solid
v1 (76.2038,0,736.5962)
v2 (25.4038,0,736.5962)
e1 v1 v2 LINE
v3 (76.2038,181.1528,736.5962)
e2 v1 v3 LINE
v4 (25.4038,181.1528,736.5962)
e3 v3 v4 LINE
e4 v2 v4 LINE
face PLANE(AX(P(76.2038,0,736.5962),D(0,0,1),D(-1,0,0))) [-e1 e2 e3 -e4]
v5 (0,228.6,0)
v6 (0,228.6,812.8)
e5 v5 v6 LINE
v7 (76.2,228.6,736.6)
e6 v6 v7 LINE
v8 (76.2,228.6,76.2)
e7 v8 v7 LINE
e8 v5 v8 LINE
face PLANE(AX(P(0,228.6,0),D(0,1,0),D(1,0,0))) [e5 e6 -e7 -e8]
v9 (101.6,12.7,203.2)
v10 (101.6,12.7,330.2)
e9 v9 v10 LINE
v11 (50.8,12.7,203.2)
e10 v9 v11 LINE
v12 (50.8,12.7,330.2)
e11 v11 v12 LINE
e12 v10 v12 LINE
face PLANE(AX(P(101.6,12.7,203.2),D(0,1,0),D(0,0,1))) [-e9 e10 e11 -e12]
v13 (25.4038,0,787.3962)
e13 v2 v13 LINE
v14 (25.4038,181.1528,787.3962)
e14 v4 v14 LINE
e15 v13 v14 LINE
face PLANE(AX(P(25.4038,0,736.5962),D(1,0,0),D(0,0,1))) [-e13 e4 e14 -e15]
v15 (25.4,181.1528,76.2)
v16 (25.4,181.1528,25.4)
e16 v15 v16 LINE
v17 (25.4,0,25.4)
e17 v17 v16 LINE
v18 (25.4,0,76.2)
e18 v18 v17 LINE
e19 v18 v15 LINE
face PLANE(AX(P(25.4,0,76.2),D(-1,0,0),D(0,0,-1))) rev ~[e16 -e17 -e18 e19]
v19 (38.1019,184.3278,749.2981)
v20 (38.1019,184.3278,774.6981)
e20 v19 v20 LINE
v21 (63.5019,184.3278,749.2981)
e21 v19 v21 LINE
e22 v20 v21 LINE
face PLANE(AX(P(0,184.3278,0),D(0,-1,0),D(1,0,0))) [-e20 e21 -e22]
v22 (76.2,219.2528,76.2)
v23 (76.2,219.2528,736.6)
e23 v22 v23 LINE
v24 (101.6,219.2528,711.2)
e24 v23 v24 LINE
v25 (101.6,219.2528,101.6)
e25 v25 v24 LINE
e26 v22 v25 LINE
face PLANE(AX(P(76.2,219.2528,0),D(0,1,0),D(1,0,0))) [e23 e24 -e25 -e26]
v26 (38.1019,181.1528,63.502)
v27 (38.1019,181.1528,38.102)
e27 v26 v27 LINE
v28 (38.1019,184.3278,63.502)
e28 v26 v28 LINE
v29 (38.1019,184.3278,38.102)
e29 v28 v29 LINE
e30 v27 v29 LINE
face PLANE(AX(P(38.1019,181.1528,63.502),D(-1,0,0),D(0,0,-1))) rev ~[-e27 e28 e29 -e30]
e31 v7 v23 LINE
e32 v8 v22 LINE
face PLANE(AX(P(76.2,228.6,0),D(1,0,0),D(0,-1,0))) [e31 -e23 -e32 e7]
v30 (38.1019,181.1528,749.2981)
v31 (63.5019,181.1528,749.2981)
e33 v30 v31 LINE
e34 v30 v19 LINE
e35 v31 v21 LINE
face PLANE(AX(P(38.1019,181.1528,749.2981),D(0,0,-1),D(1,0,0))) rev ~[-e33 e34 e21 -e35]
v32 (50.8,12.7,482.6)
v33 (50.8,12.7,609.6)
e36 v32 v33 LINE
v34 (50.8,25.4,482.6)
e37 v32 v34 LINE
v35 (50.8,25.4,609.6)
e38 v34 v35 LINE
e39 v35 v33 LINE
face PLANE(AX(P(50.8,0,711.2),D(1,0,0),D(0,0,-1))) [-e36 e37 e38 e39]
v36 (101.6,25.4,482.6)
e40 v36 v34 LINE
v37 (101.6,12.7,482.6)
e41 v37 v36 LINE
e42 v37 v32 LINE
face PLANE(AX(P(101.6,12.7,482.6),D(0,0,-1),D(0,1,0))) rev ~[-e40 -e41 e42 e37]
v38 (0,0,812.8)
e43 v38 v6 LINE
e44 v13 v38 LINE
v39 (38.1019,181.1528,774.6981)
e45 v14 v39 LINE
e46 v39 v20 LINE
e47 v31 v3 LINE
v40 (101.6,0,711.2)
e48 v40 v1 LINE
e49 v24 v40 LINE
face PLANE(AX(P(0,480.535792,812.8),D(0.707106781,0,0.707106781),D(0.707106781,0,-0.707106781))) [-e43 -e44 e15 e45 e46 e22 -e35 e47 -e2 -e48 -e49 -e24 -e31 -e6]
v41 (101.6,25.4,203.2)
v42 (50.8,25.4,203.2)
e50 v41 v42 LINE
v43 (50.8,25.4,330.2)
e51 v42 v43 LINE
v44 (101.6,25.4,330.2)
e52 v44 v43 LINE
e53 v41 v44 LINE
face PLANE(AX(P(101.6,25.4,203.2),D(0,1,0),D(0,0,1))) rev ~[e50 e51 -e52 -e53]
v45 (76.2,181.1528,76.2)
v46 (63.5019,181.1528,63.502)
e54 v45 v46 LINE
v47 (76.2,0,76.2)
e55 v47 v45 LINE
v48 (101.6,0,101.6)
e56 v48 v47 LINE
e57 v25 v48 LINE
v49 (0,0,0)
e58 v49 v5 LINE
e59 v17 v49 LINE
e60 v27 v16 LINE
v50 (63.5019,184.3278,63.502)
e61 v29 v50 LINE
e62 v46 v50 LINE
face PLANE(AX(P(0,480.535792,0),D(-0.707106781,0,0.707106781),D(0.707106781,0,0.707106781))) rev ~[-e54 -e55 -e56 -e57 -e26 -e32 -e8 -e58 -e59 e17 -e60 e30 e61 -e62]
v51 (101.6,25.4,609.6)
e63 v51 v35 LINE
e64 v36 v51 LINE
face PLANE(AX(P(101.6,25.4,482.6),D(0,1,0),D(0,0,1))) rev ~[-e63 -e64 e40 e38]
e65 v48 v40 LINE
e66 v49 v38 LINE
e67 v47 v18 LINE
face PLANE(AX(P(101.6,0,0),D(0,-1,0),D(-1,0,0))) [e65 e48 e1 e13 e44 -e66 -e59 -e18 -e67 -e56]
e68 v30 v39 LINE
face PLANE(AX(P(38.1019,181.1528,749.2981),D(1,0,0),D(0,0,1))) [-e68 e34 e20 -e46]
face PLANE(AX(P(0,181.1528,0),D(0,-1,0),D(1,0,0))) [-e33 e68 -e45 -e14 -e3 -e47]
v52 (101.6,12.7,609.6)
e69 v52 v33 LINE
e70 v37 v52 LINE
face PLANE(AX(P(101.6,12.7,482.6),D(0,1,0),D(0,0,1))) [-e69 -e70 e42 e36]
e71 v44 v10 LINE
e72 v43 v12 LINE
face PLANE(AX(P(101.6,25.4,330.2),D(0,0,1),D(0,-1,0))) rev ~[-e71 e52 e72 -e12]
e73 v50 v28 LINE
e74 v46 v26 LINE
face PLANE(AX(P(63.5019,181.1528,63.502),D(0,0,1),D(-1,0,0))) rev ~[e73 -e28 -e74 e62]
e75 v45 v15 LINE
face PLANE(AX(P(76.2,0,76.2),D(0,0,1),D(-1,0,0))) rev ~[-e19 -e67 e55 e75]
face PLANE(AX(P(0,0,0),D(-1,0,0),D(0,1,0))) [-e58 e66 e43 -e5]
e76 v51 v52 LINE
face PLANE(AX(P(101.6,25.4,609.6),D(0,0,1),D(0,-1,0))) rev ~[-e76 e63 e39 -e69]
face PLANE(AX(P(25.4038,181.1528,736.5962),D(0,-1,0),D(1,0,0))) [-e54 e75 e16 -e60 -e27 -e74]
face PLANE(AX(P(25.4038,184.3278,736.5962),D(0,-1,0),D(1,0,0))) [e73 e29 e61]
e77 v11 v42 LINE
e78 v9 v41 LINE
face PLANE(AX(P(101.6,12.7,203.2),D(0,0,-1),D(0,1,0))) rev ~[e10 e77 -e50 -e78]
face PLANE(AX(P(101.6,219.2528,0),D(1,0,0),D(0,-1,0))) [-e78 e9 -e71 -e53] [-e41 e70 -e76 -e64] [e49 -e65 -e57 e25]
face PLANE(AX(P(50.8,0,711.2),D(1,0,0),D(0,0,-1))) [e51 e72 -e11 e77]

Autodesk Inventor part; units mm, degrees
ref_plane "YZ Plane" through (0, 0, 0) normal (1, 0, 0) x (0, 1, 0)
ref_plane "XZ Plane" through (0, 0, 0) normal (0, 1, 0) x (-1, 0, 0)
ref_plane "XY Plane" through (0, 0, 0) normal (0, 0, 1) x (1, 0, 0)
sketch "Sketch1" plane through (0, 0, 0) normal (0, 0, 1) x (1, 0, 0)
  line L0 (0, 0) -> (0, 228.6)
  line L1 (0, 228.6) -> (76.2, 228.6)
  line L2 (76.2, 228.6) -> (76.2, 219.2528)
  line L3 (76.2, 219.2528) -> (101.6, 219.2528)
  line L4 (101.6, 219.2528) -> (101.6, 0)
  line L5 (101.6, 0) -> (0, 0)
  dimension "d0" = 228.6
  dimension "d1" = 76.2
  dimension "d2" = 9.3472
  dimension "d3" = 25.4
extrude "Extrusion1" add sketch "Sketch1" along normal blind 812.8
sketch "Sketch6" plane through (0, 0, 0) normal (0, -1, 0) x (1, 0, 0)
  line L0 (101.6, 0) -> (101.6, 812.8) projected
  line L1 (0, 812.8) -> (101.6, 711.2) projected
  line L2 (76.2038, 736.5962) -> (25.4038, 736.5962)
  line L3 (25.4038, 736.5962) -> (25.4038, 787.3962)
  line L4 (25.4038, 787.3962) -> (76.2, 736.6)
  point P0 (0, 0)
  point P1 (101.6, 101.6)
  dimension "d31" = 35.9156
  dimension "d32" = 50.8
  dimension "d33" = 50.8
extrude "Extrusion4" cut sketch "Sketch6" against normal blind 181.1528
sketch "Sketch7" plane through (25.4038, 0, 736.5962) normal (0, -1, 0) x (1, 0, 0)
  line L0 (76.1962, -634.9962) -> (50.7962, -660.3962)
  line L1 (50.7962, -660.3962) -> (-0.0038, -660.3962)
  line L2 (76.1962, -634.9962) -> (-25.4038, -736.5962) projected
  line L3 (76.1962, -736.5962) -> (76.1962, 76.2038) projected
  line L4 (-0.0038, -660.3962) -> (-0.0038, -711.1962)
  line L5 (-0.0038, -711.1962) -> (50.7962, -660.3962)
  point P0 (76.1962, -25.3962)
  dimension "d39" = 50.8
  dimension "d41" = 90
  dimension "d42" = 50.8
extrude "Extrusion5" cut sketch "Sketch7" against normal blind 181.1528
chamfer "Chamfer5" distance 101.6 angle 45 1 edges at (101.6, 109.6264, 812.8)
chamfer "Chamfer6" distance 101.6 angle 45 1 edges at (101.6, 109.6264, 0)
sketch "Sketch8" plane through (25.4038, 181.1528, 736.5962) normal (0, -1, 0) x (1, 0, 0)
  line L0 (-25.4038, -736.5962) -> (50.7962, -660.3962) projected
  line L1 (50.7962, -660.3962) -> (38.0981, -673.0942)
  line L2 (38.0981, -673.0942) -> (12.6981, -673.0942)
  line L3 (12.6981, -673.0942) -> (12.6981, -698.4942)
  dimension "d54" = 17.9578
  dimension "d55" = 25.4
  dimension "d56" = 25.4
extrude "Extrusion6" cut sketch "Sketch8" against normal blind 3.175
sketch "Sketch9" plane through (0, 181.1528, 0) normal (0, -1, 0) x (1, 0, 0)
  line L0 (76.2, 736.6) -> (63.5019, 749.2981)
  line L1 (38.1019, 749.2981) -> (63.5019, 749.2981)
  line L2 (38.1019, 749.2981) -> (38.1019, 774.6981)
  line L3 (38.1019, 774.6981) -> (63.5019, 749.2981)
  line L4 (25.4038, 787.3962) -> (76.2038, 736.5962) projected
  point P0 (0, 0)
extrude "Extrusion8" cut sketch "Sketch9" against normal blind 3.175
sketch "Sketch10" plane through (101.6, 0, 711.2) normal (1, 0, 0) x (0, 0, -1)
  line L0 (609.6, 219.2528) -> (0, 219.2528) projected
  line L1 (609.6, 219.2528) -> (609.6, 0) projected
  line L2 (609.6, 219.2528) -> (609.6, 0)
  line L3 (609.6, 0) -> (609.6, 12.7)
  line L4 (508, 12.7) -> (381, 12.7)
  line L5 (228.6, 12.7) -> (101.6, 12.7)
  line L6 (508, 12.7) -> (508, 25.4)
  line L7 (508, 25.4) -> (381, 25.4)
  line L8 (381, 25.4) -> (381, 12.7)
  line L9 (228.6, 12.7) -> (228.6, 25.4)
  line L10 (228.6, 25.4) -> (101.6, 25.4)
  line L11 (101.6, 25.4) -> (101.6, 12.7)
  point P0 (711.2, 0)
  dimension "d70" = 12.7
  dimension "d71" = 101.6
  dimension "d72" = 127
  dimension "d73" = 152.4
  dimension "d74" = 127
  dimension "d75" = 12.7
  dimension "d76" = 12.7
  dimension "d77" = 193.8528
extrude "Extrusion9" cut sketch "Sketch10" against normal blind 50.8 contours L5 L11 L10 L9
sketch "Sketch11" plane through (101.6, 0, 711.2) normal (1, 0, 0) x (0, 0, -1)
  line L0 (609.6, 219.2528) -> (0, 219.2528)
  line L1 (609.6, 219.2528) -> (609.6, 0)
  line L2 (609.6, 219.2528) -> (609.6, 0)
  line L3 (609.6, 0) -> (609.6, 12.7)
  line L4 (508, 12.7) -> (381, 12.7)
  line L5 (228.6, 12.7) -> (101.6, 12.7)
  line L6 (508, 12.7) -> (508, 25.4)
  line L7 (508, 25.4) -> (381, 25.4)
  line L8 (381, 25.4) -> (381, 12.7)
  line L9 (228.6, 12.7) -> (228.6, 25.4)
  line L10 (228.6, 25.4) -> (101.6, 25.4)
  line L11 (101.6, 25.4) -> (101.6, 12.7)
  point P0 (711.2, 0)
  point P1 (711.2, 0)
  dimension "d80" = 12.7
  dimension "d81" = 101.6
  dimension "d82" = 127
  dimension "d83" = 152.4
  dimension "d84" = 127
  dimension "d85" = 12.7
  dimension "d86" = 12.7
  dimension "d87" = 193.8528
extrude "Extrusion10" cut sketch "Sketch11" against normal blind 50.8 contours L4 L8 L7 L6
properties part number "SideWidth" material "Wood (Birch)"
